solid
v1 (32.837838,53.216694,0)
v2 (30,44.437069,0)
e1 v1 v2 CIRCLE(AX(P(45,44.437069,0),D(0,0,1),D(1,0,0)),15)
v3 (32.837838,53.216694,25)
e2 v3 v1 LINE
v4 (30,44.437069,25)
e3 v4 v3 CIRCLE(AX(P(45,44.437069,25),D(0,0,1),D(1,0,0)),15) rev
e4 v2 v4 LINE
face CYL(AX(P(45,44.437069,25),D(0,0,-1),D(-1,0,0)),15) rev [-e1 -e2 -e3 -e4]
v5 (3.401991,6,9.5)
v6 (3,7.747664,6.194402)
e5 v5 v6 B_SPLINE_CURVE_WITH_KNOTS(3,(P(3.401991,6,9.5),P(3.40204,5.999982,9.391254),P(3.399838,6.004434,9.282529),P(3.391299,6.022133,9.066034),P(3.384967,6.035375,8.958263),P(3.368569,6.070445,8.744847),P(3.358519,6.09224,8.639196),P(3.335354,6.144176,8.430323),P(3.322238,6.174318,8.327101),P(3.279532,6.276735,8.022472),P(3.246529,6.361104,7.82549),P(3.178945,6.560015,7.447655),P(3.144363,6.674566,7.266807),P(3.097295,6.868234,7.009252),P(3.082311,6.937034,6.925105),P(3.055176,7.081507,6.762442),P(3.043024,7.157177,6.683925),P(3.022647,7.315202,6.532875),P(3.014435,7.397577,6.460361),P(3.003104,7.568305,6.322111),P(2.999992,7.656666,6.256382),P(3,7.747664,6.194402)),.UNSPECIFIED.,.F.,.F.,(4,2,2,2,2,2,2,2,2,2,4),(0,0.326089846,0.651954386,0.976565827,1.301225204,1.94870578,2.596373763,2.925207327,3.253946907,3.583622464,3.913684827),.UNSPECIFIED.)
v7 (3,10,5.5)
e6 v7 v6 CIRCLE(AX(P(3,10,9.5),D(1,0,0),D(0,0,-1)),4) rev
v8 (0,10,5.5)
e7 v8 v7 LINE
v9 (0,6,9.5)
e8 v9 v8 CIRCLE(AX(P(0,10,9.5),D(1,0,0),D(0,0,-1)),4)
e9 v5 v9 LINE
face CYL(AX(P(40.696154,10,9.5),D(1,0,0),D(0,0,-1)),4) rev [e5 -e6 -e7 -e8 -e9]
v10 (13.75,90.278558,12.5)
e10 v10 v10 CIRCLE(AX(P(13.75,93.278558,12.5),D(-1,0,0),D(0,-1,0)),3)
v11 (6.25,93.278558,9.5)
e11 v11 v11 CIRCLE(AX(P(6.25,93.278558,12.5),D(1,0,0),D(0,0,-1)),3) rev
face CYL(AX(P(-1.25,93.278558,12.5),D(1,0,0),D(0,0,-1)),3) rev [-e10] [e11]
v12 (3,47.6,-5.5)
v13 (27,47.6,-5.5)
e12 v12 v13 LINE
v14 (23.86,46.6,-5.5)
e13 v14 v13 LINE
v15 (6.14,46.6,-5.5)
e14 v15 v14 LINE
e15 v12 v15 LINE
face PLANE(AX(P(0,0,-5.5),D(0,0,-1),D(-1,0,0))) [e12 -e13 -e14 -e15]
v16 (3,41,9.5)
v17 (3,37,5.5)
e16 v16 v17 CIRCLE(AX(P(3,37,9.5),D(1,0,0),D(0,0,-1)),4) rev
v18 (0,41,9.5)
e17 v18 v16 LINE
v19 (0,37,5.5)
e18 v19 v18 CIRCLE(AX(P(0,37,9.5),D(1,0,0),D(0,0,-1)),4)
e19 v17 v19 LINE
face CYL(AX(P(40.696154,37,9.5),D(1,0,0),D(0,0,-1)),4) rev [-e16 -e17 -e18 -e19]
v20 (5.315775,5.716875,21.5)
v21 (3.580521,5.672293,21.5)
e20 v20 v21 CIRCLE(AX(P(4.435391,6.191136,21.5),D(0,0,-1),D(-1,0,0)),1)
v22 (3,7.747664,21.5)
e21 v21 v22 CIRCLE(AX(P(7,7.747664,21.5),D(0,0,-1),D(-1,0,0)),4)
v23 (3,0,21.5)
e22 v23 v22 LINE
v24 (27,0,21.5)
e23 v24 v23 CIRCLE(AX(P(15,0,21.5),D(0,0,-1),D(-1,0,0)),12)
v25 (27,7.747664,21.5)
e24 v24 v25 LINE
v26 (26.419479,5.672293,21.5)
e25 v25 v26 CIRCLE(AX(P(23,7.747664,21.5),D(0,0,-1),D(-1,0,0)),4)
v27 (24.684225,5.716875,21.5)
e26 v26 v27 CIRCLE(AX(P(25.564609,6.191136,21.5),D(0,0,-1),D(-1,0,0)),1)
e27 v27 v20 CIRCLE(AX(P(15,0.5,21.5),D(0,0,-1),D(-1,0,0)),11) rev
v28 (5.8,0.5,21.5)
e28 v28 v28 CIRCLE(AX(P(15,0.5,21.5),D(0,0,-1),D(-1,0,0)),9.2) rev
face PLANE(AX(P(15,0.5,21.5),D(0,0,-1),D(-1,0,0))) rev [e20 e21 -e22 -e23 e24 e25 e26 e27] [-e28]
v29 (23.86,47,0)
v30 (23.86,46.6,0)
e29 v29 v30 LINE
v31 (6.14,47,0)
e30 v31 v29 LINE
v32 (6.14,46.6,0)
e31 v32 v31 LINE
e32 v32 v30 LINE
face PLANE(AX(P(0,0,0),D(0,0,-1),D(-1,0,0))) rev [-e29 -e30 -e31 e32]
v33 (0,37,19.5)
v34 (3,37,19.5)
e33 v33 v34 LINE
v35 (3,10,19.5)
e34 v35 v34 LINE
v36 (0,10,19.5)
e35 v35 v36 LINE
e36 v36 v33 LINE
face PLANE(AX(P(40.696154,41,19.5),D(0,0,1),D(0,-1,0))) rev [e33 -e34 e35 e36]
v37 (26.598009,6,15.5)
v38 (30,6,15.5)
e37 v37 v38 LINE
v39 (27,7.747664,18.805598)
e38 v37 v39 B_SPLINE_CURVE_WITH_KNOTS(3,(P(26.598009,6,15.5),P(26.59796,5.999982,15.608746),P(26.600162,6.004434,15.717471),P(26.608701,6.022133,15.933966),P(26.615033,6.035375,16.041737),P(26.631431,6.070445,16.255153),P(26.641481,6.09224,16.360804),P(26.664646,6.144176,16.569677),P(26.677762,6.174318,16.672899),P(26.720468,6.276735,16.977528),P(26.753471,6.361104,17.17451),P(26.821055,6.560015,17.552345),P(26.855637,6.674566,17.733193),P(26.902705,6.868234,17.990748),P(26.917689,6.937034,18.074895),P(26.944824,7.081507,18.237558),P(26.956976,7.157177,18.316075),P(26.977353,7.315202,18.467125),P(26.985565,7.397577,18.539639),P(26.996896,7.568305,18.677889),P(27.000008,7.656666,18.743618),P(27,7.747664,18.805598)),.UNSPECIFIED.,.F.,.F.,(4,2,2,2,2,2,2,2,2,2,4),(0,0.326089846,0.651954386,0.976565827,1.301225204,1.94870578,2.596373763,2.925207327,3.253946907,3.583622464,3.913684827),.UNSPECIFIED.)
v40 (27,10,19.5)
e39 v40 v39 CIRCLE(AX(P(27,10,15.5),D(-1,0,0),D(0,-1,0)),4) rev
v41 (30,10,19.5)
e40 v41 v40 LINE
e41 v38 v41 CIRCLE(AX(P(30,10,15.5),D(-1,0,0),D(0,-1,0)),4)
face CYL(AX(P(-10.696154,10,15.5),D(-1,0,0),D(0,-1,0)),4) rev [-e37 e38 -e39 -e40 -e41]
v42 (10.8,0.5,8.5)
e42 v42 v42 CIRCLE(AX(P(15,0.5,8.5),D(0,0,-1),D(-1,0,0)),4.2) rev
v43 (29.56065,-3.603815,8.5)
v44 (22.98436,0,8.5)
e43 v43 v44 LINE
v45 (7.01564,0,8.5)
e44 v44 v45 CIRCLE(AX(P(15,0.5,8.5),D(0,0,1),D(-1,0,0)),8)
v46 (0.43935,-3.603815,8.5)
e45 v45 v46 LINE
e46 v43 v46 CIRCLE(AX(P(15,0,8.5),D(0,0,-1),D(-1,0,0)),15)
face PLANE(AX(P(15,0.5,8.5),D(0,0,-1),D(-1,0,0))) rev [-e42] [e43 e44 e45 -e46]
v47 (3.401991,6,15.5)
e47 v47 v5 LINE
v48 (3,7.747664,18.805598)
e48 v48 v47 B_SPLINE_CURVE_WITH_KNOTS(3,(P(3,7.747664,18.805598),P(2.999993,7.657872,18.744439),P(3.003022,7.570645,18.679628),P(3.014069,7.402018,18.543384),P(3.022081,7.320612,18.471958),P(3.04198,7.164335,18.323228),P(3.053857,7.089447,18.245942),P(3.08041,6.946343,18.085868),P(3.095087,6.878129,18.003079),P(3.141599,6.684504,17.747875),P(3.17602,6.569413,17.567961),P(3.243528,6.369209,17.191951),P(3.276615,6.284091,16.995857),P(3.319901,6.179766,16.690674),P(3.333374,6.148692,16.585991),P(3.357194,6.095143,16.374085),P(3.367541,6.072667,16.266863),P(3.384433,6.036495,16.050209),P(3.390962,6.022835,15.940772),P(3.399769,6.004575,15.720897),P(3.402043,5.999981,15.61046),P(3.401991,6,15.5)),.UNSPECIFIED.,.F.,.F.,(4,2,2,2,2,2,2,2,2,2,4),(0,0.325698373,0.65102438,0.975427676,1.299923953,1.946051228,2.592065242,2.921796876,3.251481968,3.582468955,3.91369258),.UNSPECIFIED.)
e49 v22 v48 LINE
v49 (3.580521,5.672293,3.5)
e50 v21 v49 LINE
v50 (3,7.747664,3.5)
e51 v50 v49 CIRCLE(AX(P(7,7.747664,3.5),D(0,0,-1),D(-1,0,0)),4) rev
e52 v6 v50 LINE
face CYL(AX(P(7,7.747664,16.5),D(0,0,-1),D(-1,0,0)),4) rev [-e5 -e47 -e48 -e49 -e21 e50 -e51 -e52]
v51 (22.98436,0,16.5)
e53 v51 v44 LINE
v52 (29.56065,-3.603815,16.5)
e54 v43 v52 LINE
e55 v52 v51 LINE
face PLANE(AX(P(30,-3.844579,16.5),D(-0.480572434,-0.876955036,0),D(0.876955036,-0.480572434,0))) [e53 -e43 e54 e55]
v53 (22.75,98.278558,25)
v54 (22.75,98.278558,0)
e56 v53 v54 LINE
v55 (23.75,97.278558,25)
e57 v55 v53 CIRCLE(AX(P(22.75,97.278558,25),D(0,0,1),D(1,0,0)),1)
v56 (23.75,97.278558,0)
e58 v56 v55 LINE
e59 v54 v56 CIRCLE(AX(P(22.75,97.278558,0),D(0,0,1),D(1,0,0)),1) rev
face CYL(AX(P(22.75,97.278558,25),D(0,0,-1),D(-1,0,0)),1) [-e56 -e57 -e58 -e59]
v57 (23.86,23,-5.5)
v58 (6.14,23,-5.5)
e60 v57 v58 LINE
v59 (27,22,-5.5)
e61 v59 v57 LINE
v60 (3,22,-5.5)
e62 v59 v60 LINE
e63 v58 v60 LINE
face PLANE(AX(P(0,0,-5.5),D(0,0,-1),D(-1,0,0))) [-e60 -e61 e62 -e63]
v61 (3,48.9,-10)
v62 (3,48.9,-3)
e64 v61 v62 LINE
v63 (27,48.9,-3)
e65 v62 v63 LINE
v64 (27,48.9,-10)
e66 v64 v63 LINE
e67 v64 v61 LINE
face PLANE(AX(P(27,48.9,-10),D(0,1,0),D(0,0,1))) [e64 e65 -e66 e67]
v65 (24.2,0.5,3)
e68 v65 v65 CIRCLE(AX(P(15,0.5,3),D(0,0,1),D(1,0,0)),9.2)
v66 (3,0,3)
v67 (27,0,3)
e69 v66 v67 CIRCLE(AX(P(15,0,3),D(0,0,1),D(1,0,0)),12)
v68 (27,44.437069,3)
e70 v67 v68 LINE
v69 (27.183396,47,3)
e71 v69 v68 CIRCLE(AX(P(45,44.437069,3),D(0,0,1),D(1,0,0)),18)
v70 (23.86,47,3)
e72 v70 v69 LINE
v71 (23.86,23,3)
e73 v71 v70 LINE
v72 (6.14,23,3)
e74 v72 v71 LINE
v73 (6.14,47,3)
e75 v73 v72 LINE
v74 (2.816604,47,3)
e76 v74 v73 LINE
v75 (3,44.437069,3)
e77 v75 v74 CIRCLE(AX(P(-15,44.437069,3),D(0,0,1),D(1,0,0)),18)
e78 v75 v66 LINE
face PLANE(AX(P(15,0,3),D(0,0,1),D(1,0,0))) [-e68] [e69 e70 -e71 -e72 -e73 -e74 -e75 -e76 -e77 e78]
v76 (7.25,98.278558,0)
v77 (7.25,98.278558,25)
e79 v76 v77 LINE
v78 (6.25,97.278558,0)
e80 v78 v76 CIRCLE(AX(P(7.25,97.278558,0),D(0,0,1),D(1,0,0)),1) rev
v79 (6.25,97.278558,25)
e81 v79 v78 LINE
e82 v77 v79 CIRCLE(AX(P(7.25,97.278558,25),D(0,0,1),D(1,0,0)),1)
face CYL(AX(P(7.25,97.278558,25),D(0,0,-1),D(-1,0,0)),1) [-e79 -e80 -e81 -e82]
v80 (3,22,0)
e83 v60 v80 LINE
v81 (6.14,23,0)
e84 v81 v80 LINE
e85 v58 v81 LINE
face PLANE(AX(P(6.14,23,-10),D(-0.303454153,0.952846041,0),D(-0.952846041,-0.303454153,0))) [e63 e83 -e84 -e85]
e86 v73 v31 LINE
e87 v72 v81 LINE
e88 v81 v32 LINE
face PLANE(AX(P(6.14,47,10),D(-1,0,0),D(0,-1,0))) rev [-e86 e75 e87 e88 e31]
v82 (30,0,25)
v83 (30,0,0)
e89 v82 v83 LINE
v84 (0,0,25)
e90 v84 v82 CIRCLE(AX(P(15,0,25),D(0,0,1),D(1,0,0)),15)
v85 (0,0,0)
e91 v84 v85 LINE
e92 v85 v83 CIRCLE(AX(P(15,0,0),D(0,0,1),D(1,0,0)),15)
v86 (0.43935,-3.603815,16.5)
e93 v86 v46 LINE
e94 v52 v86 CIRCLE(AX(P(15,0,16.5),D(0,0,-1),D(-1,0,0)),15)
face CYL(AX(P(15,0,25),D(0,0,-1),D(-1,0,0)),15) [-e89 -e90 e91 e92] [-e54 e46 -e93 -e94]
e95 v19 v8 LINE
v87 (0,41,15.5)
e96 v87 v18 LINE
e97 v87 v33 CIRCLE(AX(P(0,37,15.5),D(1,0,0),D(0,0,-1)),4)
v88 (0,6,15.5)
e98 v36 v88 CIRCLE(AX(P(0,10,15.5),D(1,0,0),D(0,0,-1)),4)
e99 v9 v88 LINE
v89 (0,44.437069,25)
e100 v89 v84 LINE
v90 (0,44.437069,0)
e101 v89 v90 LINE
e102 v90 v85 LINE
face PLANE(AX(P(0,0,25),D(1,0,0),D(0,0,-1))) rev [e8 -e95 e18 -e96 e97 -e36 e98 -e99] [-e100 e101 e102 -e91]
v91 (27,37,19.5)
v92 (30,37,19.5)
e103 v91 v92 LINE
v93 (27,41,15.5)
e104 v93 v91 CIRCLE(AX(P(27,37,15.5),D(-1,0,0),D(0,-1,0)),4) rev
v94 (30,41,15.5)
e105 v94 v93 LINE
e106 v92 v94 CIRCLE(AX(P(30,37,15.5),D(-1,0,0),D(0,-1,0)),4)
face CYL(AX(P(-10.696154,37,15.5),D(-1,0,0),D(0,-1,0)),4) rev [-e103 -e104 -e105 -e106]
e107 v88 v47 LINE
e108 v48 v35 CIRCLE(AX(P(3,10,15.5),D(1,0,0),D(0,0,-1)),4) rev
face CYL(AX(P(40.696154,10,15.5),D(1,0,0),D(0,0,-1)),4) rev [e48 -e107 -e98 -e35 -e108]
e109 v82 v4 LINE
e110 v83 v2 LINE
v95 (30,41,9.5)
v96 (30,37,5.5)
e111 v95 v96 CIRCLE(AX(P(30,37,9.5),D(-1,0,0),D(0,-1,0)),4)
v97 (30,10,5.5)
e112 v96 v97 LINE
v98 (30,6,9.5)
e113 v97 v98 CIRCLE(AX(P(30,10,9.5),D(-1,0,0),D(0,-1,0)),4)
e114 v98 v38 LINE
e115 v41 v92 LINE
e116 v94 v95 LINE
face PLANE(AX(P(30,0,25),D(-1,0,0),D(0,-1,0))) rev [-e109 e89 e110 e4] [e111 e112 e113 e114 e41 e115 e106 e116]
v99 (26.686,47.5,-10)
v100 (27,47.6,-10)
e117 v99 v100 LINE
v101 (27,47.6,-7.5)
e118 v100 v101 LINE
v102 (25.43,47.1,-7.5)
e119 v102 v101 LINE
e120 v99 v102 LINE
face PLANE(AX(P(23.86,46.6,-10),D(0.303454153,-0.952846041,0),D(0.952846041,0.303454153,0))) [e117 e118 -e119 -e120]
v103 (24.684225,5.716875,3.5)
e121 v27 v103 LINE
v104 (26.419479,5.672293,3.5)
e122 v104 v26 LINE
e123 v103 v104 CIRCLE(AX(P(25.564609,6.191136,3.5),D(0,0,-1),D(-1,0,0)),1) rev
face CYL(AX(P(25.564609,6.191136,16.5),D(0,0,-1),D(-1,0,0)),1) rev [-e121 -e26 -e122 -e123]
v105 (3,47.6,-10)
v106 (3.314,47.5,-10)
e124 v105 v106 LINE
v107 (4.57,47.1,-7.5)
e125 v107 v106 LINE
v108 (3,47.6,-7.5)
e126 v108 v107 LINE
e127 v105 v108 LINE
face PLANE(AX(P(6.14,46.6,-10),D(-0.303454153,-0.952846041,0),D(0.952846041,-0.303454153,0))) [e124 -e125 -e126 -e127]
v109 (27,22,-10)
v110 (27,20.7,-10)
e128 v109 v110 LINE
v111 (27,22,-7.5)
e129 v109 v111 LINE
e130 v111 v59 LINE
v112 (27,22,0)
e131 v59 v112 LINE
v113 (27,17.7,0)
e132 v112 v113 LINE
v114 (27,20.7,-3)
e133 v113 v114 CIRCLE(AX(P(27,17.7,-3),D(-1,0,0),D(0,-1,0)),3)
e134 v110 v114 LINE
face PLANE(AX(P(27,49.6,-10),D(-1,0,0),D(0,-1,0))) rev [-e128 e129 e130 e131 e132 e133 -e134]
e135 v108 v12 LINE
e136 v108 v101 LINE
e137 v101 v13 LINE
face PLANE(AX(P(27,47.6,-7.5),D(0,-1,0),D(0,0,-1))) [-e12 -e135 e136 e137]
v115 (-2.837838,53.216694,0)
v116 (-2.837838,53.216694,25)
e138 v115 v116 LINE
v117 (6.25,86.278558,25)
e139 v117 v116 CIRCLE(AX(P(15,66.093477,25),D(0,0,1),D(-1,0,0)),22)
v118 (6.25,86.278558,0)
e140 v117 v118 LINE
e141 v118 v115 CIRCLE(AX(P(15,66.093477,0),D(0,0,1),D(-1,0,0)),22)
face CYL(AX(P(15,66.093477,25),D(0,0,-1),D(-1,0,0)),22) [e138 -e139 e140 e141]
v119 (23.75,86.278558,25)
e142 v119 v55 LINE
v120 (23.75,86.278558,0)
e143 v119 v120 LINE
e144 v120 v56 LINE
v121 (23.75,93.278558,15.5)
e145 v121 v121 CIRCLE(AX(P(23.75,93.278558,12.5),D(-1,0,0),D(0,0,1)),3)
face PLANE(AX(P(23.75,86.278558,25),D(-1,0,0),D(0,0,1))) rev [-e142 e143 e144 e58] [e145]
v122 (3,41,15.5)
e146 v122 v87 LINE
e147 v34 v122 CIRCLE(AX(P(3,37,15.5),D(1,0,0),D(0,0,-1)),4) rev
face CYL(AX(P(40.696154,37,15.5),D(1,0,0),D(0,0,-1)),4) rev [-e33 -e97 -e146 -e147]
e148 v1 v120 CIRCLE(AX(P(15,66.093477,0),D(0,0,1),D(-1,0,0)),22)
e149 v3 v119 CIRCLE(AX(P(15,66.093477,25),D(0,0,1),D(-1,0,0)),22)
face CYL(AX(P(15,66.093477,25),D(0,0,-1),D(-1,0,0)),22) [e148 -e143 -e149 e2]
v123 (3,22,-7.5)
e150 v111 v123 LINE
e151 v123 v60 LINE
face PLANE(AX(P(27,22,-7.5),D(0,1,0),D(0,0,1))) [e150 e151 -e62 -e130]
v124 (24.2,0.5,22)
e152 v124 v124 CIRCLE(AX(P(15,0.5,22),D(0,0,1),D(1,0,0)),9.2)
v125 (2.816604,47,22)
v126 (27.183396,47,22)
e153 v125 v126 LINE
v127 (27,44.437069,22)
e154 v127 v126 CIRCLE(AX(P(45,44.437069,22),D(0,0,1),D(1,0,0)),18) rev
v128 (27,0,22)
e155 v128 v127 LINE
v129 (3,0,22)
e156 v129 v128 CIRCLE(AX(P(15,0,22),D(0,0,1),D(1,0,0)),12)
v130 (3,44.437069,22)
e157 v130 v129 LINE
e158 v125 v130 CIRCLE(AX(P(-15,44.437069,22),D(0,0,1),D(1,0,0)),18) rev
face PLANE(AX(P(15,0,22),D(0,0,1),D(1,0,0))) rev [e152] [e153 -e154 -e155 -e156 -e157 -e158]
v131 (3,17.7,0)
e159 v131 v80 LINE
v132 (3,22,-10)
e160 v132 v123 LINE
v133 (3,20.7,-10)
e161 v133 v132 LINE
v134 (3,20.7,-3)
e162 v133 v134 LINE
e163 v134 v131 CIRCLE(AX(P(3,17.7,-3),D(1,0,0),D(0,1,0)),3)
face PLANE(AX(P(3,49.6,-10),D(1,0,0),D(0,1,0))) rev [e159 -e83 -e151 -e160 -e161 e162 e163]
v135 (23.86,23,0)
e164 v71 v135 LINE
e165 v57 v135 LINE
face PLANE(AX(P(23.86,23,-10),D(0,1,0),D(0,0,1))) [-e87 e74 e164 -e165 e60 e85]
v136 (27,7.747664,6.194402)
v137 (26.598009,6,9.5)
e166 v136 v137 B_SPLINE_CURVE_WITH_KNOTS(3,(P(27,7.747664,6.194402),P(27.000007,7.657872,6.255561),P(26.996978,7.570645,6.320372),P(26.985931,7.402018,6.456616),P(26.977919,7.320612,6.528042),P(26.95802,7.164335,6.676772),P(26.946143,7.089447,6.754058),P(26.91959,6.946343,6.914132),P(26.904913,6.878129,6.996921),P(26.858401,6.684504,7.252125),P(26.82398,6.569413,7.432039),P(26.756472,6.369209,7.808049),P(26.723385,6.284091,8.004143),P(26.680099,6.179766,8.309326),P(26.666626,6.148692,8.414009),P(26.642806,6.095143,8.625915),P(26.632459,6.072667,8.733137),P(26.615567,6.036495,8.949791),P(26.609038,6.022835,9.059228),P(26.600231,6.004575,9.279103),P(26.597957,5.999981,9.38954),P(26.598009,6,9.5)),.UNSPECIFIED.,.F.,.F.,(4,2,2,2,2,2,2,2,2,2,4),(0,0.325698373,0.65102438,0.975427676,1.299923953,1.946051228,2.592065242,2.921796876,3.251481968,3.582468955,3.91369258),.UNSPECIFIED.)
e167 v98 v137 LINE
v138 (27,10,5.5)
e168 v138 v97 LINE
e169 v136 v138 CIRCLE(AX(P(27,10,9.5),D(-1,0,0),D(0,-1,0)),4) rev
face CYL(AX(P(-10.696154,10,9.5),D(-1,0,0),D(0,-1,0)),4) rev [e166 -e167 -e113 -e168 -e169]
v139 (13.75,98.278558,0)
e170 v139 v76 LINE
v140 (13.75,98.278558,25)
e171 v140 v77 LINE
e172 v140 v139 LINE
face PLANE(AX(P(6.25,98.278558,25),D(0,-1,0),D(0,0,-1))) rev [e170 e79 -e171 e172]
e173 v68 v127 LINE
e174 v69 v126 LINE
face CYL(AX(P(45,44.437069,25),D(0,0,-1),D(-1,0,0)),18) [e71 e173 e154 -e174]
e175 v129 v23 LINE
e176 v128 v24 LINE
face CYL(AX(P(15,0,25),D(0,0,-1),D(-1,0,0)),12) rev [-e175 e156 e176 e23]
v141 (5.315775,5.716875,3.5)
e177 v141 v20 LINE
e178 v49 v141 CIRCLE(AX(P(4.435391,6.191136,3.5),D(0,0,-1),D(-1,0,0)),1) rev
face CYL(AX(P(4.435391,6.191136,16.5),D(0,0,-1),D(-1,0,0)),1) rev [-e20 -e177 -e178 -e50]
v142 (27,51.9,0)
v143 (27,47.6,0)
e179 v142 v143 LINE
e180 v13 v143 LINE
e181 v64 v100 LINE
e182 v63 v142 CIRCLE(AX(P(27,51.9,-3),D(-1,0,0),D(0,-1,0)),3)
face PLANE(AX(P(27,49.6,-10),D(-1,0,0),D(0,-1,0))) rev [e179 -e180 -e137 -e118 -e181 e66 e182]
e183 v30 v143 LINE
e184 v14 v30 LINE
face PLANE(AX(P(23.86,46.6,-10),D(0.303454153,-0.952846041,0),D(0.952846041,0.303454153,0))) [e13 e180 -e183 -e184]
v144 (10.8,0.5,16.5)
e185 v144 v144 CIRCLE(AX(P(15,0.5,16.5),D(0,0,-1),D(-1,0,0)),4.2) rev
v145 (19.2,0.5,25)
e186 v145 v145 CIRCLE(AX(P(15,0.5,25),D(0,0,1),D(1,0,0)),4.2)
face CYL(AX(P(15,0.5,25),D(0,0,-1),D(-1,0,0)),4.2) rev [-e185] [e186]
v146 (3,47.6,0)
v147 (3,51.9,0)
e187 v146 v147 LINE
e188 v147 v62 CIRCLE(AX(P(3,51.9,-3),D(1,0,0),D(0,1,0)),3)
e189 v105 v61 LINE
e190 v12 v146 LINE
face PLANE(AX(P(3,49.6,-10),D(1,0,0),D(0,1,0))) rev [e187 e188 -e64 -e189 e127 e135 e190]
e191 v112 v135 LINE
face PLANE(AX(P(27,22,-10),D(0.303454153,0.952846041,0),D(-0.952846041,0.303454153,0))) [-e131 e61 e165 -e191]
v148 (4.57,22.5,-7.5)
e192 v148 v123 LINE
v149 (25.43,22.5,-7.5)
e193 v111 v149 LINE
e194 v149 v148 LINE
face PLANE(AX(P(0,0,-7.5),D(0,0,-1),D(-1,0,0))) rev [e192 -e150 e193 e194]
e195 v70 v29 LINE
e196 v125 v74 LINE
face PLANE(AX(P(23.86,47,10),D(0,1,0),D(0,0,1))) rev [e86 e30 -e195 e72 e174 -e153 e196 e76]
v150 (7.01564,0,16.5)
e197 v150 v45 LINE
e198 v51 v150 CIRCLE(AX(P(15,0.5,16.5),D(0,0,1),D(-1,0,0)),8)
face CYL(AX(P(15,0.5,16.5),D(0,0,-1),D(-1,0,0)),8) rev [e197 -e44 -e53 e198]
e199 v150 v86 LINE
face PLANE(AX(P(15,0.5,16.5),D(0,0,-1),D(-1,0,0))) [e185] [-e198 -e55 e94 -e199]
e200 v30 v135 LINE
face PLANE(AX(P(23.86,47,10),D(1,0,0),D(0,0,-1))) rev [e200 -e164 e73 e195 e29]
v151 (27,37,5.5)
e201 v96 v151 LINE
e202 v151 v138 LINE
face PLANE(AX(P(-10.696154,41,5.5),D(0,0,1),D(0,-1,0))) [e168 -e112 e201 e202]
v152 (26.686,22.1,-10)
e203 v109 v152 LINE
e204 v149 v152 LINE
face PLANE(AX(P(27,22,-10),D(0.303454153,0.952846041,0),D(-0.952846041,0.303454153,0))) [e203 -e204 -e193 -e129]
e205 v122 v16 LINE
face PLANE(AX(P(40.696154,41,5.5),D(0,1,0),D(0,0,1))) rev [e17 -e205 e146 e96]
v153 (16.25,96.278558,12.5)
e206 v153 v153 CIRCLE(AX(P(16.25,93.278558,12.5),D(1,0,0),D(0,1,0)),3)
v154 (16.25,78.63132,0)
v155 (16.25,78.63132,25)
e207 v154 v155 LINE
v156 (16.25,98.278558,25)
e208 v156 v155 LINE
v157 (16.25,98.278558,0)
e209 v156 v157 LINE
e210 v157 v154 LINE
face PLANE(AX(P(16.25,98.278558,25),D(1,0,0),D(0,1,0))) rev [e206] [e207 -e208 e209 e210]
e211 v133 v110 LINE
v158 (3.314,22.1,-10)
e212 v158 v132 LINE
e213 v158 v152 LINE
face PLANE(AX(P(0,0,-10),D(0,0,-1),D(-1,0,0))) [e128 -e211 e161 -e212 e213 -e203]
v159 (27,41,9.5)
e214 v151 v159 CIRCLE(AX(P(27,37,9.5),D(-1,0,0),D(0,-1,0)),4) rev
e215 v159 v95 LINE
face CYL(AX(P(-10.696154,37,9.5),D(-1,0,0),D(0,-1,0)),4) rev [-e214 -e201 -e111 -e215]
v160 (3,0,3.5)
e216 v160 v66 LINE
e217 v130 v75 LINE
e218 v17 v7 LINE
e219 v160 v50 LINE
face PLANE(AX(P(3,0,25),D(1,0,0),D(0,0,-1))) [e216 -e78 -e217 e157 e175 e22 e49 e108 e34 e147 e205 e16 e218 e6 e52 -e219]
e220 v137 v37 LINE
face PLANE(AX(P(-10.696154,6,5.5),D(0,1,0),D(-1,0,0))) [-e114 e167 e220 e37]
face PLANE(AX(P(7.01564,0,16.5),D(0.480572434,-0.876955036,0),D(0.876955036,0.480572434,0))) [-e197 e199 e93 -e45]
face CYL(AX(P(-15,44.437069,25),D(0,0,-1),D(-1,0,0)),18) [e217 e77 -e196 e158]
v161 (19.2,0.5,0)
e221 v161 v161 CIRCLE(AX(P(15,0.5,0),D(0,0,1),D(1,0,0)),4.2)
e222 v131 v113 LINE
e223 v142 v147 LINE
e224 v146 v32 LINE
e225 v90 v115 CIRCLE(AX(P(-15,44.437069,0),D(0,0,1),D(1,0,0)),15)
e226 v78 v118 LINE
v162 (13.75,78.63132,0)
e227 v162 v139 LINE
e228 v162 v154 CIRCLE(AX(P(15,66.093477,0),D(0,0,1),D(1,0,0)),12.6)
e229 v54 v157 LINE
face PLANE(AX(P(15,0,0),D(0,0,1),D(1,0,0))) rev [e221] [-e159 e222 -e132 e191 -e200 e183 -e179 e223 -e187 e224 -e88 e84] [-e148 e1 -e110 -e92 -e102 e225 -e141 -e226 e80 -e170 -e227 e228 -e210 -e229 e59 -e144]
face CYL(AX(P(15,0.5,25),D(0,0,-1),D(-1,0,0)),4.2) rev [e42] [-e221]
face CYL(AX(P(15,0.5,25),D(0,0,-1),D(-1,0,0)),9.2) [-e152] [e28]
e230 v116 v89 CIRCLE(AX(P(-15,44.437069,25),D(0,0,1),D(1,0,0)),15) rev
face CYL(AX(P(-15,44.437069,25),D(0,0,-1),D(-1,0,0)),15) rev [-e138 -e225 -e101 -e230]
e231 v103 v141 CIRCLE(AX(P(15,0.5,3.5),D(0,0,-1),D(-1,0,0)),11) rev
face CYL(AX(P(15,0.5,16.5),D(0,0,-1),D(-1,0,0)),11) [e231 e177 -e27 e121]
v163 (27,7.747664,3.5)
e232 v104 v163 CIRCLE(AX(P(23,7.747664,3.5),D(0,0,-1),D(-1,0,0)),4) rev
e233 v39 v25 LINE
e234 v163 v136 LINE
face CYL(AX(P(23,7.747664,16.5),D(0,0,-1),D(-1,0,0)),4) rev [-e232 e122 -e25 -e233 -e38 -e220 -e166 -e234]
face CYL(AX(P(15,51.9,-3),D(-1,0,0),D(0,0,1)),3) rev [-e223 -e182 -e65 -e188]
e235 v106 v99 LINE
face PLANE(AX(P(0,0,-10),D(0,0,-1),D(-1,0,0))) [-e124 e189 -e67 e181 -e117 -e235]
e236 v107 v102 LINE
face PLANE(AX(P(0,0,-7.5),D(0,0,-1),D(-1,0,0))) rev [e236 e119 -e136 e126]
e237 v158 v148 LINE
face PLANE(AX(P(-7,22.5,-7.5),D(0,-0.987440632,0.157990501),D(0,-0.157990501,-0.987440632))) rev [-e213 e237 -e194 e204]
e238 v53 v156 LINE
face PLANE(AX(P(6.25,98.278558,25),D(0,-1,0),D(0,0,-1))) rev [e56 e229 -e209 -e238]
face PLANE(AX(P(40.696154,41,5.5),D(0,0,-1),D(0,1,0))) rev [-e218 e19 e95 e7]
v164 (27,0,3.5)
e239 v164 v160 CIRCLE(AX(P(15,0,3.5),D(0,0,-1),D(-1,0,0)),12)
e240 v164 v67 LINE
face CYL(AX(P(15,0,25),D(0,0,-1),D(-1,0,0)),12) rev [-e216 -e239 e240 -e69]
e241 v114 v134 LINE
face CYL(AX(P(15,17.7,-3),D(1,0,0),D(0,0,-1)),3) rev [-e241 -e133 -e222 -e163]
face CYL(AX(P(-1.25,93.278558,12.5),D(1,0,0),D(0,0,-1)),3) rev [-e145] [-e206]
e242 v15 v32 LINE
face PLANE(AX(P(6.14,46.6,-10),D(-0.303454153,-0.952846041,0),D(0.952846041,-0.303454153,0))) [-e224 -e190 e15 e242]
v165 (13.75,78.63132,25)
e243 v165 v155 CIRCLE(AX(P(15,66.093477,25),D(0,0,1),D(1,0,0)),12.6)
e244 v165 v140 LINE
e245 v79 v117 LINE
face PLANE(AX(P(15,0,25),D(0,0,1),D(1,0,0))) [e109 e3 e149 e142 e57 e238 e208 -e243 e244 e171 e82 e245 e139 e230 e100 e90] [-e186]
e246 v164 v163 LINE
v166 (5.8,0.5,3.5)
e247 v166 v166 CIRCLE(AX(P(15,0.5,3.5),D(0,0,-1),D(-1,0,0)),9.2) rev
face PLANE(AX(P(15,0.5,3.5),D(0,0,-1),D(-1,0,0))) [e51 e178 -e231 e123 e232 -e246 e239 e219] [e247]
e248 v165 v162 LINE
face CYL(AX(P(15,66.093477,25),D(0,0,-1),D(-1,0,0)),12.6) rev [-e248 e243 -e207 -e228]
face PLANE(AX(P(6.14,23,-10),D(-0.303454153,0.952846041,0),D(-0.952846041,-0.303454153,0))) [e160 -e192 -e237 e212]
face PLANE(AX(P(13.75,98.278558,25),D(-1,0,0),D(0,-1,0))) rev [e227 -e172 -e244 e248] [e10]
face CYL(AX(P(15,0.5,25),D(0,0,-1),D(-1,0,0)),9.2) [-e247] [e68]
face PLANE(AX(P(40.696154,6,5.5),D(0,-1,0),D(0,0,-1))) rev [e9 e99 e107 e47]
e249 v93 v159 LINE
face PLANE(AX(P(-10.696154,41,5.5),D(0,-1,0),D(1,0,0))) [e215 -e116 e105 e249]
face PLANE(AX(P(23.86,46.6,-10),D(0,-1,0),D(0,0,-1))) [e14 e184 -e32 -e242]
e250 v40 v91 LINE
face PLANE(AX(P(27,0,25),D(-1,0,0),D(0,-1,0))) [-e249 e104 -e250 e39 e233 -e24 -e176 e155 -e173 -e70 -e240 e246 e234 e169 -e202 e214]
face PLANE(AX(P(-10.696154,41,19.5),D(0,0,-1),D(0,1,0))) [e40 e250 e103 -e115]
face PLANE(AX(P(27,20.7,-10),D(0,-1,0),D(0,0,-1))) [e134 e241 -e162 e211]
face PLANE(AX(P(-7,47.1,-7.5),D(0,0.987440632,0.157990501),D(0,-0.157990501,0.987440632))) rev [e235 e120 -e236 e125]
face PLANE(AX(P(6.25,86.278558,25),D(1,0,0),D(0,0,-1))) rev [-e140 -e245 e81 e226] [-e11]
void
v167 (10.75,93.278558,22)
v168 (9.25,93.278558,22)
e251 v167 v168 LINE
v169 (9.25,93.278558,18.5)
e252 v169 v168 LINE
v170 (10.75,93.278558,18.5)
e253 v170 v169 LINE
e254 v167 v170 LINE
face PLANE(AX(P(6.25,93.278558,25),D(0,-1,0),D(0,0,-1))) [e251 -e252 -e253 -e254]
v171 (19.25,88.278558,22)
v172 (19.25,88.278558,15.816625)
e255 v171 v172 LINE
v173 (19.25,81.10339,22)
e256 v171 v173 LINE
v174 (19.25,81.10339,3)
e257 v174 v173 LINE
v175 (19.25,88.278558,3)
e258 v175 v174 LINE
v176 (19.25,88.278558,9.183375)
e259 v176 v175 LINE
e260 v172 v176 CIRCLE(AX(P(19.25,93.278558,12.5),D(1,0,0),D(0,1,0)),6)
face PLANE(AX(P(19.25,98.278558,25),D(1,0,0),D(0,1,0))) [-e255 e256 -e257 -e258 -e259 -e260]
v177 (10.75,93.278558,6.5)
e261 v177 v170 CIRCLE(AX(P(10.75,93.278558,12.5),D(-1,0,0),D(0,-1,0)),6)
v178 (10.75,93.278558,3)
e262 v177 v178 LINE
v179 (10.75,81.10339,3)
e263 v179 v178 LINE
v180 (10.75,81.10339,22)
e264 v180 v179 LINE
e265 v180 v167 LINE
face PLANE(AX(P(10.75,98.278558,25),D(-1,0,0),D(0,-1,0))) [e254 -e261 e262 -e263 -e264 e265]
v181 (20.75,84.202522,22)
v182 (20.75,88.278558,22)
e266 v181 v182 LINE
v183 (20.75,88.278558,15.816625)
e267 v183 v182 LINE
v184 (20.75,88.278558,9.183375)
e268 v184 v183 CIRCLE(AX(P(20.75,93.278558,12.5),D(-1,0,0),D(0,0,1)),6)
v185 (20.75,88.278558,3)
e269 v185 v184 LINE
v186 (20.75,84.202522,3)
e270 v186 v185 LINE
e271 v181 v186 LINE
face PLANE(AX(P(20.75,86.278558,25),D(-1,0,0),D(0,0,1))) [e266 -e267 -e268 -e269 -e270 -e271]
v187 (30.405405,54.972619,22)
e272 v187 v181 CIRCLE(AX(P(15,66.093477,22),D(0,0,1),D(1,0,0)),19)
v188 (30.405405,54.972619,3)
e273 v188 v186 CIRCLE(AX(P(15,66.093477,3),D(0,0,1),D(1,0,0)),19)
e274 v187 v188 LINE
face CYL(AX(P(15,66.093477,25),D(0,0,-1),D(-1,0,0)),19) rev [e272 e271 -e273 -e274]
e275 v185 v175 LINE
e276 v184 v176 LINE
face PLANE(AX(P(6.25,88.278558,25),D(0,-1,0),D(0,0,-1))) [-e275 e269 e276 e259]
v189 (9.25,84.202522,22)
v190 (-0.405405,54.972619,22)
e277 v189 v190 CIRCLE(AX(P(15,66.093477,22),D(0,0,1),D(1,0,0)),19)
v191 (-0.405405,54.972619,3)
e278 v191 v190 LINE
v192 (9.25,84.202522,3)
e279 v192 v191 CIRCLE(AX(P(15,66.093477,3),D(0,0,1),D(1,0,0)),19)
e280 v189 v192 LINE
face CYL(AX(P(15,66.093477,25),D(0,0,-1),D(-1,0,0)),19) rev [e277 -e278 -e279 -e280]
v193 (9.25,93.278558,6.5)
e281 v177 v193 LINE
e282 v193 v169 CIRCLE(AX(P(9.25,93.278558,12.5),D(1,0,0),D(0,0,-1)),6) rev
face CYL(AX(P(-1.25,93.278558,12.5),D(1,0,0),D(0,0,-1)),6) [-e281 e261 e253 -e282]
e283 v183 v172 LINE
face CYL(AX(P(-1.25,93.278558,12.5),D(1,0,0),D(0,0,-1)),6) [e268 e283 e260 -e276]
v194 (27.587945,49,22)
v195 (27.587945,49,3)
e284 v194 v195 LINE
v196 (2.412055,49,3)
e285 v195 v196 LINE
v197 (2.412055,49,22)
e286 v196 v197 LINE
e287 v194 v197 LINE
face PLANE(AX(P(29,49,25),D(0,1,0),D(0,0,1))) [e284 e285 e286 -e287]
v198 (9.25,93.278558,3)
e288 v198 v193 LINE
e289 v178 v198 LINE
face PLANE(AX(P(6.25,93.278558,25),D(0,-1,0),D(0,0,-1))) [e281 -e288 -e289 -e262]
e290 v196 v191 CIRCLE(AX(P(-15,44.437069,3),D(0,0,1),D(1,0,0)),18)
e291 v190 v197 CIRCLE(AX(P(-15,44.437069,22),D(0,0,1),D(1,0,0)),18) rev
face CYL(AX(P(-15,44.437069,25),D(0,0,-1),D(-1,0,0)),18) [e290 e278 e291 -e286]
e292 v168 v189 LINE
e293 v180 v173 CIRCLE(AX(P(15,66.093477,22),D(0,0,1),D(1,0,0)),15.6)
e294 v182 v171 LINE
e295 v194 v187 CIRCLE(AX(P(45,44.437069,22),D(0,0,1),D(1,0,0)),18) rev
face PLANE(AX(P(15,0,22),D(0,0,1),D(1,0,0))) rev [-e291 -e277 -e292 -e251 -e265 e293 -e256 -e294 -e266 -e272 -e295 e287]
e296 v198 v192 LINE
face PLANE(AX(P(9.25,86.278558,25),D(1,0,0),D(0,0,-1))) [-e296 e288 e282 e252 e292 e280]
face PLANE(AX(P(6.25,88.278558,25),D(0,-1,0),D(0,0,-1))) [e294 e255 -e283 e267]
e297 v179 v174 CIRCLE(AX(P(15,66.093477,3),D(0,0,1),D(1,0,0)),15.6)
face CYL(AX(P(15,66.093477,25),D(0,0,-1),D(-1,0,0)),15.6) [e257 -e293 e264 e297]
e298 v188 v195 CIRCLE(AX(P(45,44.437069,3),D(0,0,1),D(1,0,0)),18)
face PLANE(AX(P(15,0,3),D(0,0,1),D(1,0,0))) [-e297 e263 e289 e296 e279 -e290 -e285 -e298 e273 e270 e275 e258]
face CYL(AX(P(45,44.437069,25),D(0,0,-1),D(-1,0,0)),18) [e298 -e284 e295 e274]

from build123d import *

# Parameters (mm, degrees)
BOSS_EXTRUDE1_DEPTH      = 25
CUT_EXTRUDE4_START       = 8.5
CUT_EXTRUDE4_DEPTH       = 8
SKETCH10_R               = 4.2
CUT_EXTRUDE6_DEPTH       = 99.764673235
SKETCH11_W               = 24
SKETCH11_H               = 29.6
BOSS_EXTRUDE2_DEPTH      = 10
CUT_EXTRUDE7_DEPTH       = 99.764673235
CUT_EXTRUDE8_START       = 5.5
SKETCH14_W               = 24
SKETCH14_H               = 25.6
CUT_EXTRUDE8_DEPTH       = 2
SKETCH22_R               = 12.6
CUT_EXTRUDE16_DEPTH      = 99.764673235
SKETCH24_W               = 17.5
SKETCH24_H               = 12
BOSS_EXTRUDE3_DEPTH      = 25
FILLET6_R                = 15
FILLET7_R                = 1
SKETCH25_R               = 3
CUT_EXTRUDE18_DEPTH      = 25
SKETCH26_W               = 2.5
SKETCH26_H               = 20
CUT_EXTRUDE19_DEPTH      = 25
SHELL14_START            = 9.25
SHELL14_DEPTH            = 1.5
SHELL14_START_2          = 3
SHELL14_2_DEPTH          = 19
SHELL14_3_OUTLINE_R      = 9.2
SHELL14_3_DEPTH          = 0.5
SHELL14_START_3          = 21.5
SHELL14_4_OUTLINE_R      = 9.2
SHELL14_4_DEPTH          = 0.5
SHELL14_START_4          = 8
SHELL14_5_DEPTH          = 2.75
SHELL14_START_5          = 19.25
SHELL14_6_DEPTH          = 1.5
SKETCH27_W               = 17.72
SKETCH27_H               = 24
CUT_EXTRUDE20_DEPTH      = 10
SKETCH28_W               = 14
SKETCH28_H               = 35
CUT_EXTRUDE21_DEPTH      = 3
SKETCH29_W               = 14
SKETCH29_H               = 35
CUT_EXTRUDE22_DEPTH      = 3
FILLET8_R                = 4
FILLET9_START            = 3.5
FILLET9_DEPTH            = 18
FILLET9_START_2          = 15.4999999
FILLET9_2_DEPTH          = 6.0000001
FILLET9_3_DEPTH          = 6
FILLET9_START_3          = 26.598008456
FILLET9_4_DEPTH          = 0.401991544
FILLET9_START_4          = 3
FILLET9_5_DEPTH          = 0.401990551
FILLET10_R               = 1
CUT_EXTRUDE23_DEPTH      = 108.947556596
CUT_EXTRUDE23_DEPTH_BACK = 108.947556596
SKETCH32_W               = 24
SKETCH32_H               = 0.7
CUT_EXTRUDE24_DEPTH      = 108.947556596
FILLET11_R               = 3
BOSS_EXTRUDE4_REACH      = 109.948
SKETCH33_W               = 28
SKETCH33_H               = 2


with BuildPart() as part:
    # Sketch1 → Boss-Extrude1 (new body)
    with BuildSketch(Plane.XY):
        with BuildLine():
            Line((30, 0), (30, 50))
            ThreePointArc((30, 50), (15, 88.093476939), (0, 50))
            Line((0, 50), (0, 0))
            ThreePointArc((0, 0), (15, -15), (30, 0))
        make_face()
    extrude(amount=BOSS_EXTRUDE1_DEPTH)

    # Sketch9 → Cut-Extrude4 (cut)
    with BuildSketch(Plane.XY.offset(CUT_EXTRUDE4_START)):
        with BuildLine():
            Line((7.015640289, 0), (0, -3.844579475))
            Line((0, -3.844579475), (0, -19.136394538))
            Line((0, -19.136394538), (30, -19.136394538))
            Line((30, -19.136394538), (30, -3.844579475))
            Line((30, -3.844579475), (22.984359711, 0))
            ThreePointArc((22.984359711, 0), (15, 8.5), (7.015640289, 0))
        make_face()
    extrude(amount=CUT_EXTRUDE4_DEPTH, mode=Mode.SUBTRACT)

    # Sketch10 → Cut-Extrude6 (cut, through all)
    with BuildSketch(Plane.XY):
        with Locations(Location((15, 0.5, 0), (0, 0, 180))):
            Circle(SKETCH10_R)
    extrude(amount=CUT_EXTRUDE6_DEPTH, mode=Mode.SUBTRACT)

    # Sketch11 → Boss-Extrude2 (add)
    with BuildSketch(Plane(origin=(0, 0, 0), x_dir=(-1, 0, 0), z_dir=(0, 0, -1))):
        with Locations((-15, 34.8)):
            Rectangle(SKETCH11_W, SKETCH11_H)
    extrude(amount=BOSS_EXTRUDE2_DEPTH)

    # Sketch12 → Cut-Extrude7 (cut, through all)
    with BuildSketch(Plane(origin=(0, 0, 0), x_dir=(-1, 0, 0), z_dir=(0, 0, -1))):
        Polygon((-3, 47.6), (-3, 22), (-6.14, 23), (-23.86, 23), (-27, 22), (-27, 47.6), (-23.86, 46.6), (-6.14, 46.6), align=None)
    extrude(amount=CUT_EXTRUDE7_DEPTH, mode=Mode.SUBTRACT)

    # Sketch14 → Cut-Extrude8 (cut)
    with BuildSketch(Plane(origin=(0, 0, 0), x_dir=(-1, 0, 0), z_dir=(0, 0, -1)).offset(CUT_EXTRUDE8_START)):
        with Locations((-15, 34.8)):
            Rectangle(SKETCH14_W, SKETCH14_H)
    extrude(amount=CUT_EXTRUDE8_DEPTH, mode=Mode.SUBTRACT)

    # Sketch22 → Cut-Extrude16 (cut, through all)
    with BuildSketch(Plane.XY):
        with Locations((15, 66.093476939)):
            Circle(SKETCH22_R)
    extrude(amount=CUT_EXTRUDE16_DEPTH, mode=Mode.SUBTRACT)

    # Sketch24 → Boss-Extrude3 (add)
    with BuildSketch(Plane.XY):
        with Locations((15, 92.278558064)):
            Rectangle(SKETCH24_W, SKETCH24_H)
    extrude(amount=BOSS_EXTRUDE3_DEPTH)

    # Fillet6
    fillet6_edges = [part.edges().sort_by_distance(p)[0] for p in [
        (0, 50, 12.5),
        (30, 50, 12.5),
    ]]
    fillet(fillet6_edges, radius=FILLET6_R)

    # Fillet7
    fillet7_edges = [part.edges().sort_by_distance(p)[0] for p in [
        (6.25, 98.278558064, 12.5),
        (23.75, 98.278558064, 12.5),
    ]]
    fillet(fillet7_edges, radius=FILLET7_R)

    # Sketch25 → Cut-Extrude18 (cut)
    with BuildSketch(Plane(origin=(23.75, 0, 23.75), x_dir=(0, 0, 1), z_dir=(-1, 0, 0))):
        with Locations(Location((-11.25, 93.278558064, 0), (0, 0, 180))):
            Circle(SKETCH25_R)
    extrude(amount=CUT_EXTRUDE18_DEPTH, mode=Mode.SUBTRACT)

    # Sketch26 → Cut-Extrude19 (cut)
    with BuildSketch(Plane(origin=(0, 0, 0), x_dir=(-1, 0, 0), z_dir=(0, 0, -1))):
        with Locations((-15, 88.278558064)):
            Rectangle(SKETCH26_W, SKETCH26_H)
    extrude(amount=-CUT_EXTRUDE19_DEPTH, mode=Mode.SUBTRACT)

    # Shell14: read off the stored shape, not the designer's step
    # Shell14 outline → Shell14 (cut)
    with BuildSketch(Plane.YZ.offset(SHELL14_START)):
        with BuildLine():
            Line((93.278558064, 22), (88.278558064, 22))
            Line((88.278558064, 22), (88.278558064, 15.81662479))
            ThreePointArc((88.278558064, 15.81662479), (90.441283733, 17.786764074), (93.278558064, 18.5))
            Line((93.278558064, 18.5), (93.278558064, 22))
        make_face()
        with BuildLine():
            ThreePointArc((93.278558064, 6.5), (90.441283733, 7.213235926), (88.278558064, 9.18337521))
            Line((88.278558064, 9.18337521), (88.278558064, 3))
            Line((88.278558064, 3), (93.278558064, 3))
            Line((93.278558064, 3), (93.278558064, 6.5))
        make_face()
    extrude(amount=SHELL14_DEPTH, mode=Mode.SUBTRACT)

    # Shell14 2 outline → Shell14 2 (cut)
    with BuildSketch(Plane.XY.offset(SHELL14_START_2)):
        with BuildLine():
            Line((20.75, 88.278558064), (19.25, 88.278558064))
            Line((19.25, 88.278558064), (19.25, 81.10339033))
            ThreePointArc((19.25, 81.10339033), (15, 50.493476939), (10.75, 81.10339033))
            Line((10.75, 81.10339033), (10.75, 88.278558064))
            Line((10.75, 88.278558064), (9.25, 88.278558064))
            Line((9.25, 88.278558064), (9.25, 84.202521641))
            ThreePointArc((9.25, 84.202521641), (-3.041191716, 72.052956906), (-0.405405405, 54.972618866))
            ThreePointArc((-0.405405405, 54.972618866), (2.127502776, 49.973191279), (3, 44.437069112))
            Line((3, 44.437069112), (3, 3.500970796))
            Line((3, 3.500970796), (4.734171365, 4.451298829))
            ThreePointArc((4.734171365, 4.451298829), (15, 11.5), (25.265828635, 4.451298829))
            Line((25.265828635, 4.451298829), (27, 3.500970796))
            Line((27, 3.500970796), (27, 44.437069112))
            ThreePointArc((27, 44.437069112), (27.872497224, 49.973191279), (30.405405405, 54.972618866))
            ThreePointArc((30.405405405, 54.972618866), (33.041191716, 72.052956906), (20.75, 84.202521641))
            Line((20.75, 84.202521641), (20.75, 88.278558064))
        make_face()
    extrude(amount=SHELL14_2_DEPTH, mode=Mode.SUBTRACT)

    # Shell14 3 outline → Shell14 3 (cut)
    with BuildSketch(Plane.XY.offset(SHELL14_START_2)):
        with BuildLine():
            Line((27, 0), (27, 3.500970796))
            Line((27, 3.500970796), (25.265828635, 4.451298829))
            ThreePointArc((25.265828635, 4.451298829), (15, 11.5), (4.734171365, 4.451298829))
            Line((4.734171365, 4.451298829), (3, 3.500970796))
            Line((3, 3.500970796), (3, 0))
            ThreePointArc((3, 0), (15, -12), (27, 0))
        make_face()
        with Locations((15, 0.5)):
            Circle(SHELL14_3_OUTLINE_R, mode=Mode.SUBTRACT)
    extrude(amount=SHELL14_3_DEPTH, mode=Mode.SUBTRACT)

    # Shell14 4 outline → Shell14 4 (cut)
    with BuildSketch(Plane.XY.offset(SHELL14_START_3)):
        with BuildLine():
            Line((27, 0), (27, 3.500970796))
            Line((27, 3.500970796), (25.265828635, 4.451298829))
            ThreePointArc((25.265828635, 4.451298829), (15, 11.5), (4.734171365, 4.451298829))
            Line((4.734171365, 4.451298829), (3, 3.500970796))
            Line((3, 3.500970796), (3, 0))
            ThreePointArc((3, 0), (15, -12), (27, 0))
        make_face()
        with Locations((15, 0.5)):
            Circle(SHELL14_4_OUTLINE_R, mode=Mode.SUBTRACT)
    extrude(amount=SHELL14_4_DEPTH, mode=Mode.SUBTRACT)

    # Shell14 5 outline → Shell14 5 (add)
    with BuildSketch(Plane.YZ.offset(SHELL14_START_4)):
        with BuildLine():
            Line((88.278558064, 9.18337521), (88.278558064, 15.81662479))
            ThreePointArc((88.278558064, 15.81662479), (87.278558064, 12.5), (88.278558064, 9.18337521))
        make_face()
    extrude(amount=SHELL14_5_DEPTH)

    # Shell14 6 outline → Shell14 6 (add)
    with BuildSketch(Plane.YZ.offset(SHELL14_START_5)):
        with BuildLine():
            Line((88.278558064, 9.18337521), (88.278558064, 15.81662479))
            ThreePointArc((88.278558064, 15.81662479), (87.278558064, 12.5), (88.278558064, 9.18337521))
        make_face()
    extrude(amount=SHELL14_6_DEPTH)

    # Sketch27 → Cut-Extrude20 (cut)
    with BuildSketch(Plane(origin=(0, 0, 0), x_dir=(-1, 0, 0), z_dir=(0, 0, -1))):
        with Locations((-15, 35)):
            Rectangle(SKETCH27_W, SKETCH27_H)
    extrude(amount=-CUT_EXTRUDE20_DEPTH, mode=Mode.SUBTRACT)

    # Sketch28 → Cut-Extrude21 (cut)
    with BuildSketch(Plane.ZY):
        with Locations((12.5, 23.5)):
            Rectangle(SKETCH28_W, SKETCH28_H)
    extrude(amount=-CUT_EXTRUDE21_DEPTH, mode=Mode.SUBTRACT)

    # Sketch29 → Cut-Extrude22 (cut)
    with BuildSketch(Plane(origin=(30, 0, -30), x_dir=(0, 0, 1), z_dir=(-1, 0, 0))):
        with Locations((42.5, 23.5)):
            Rectangle(SKETCH29_W, SKETCH29_H)
    extrude(amount=CUT_EXTRUDE22_DEPTH, mode=Mode.SUBTRACT)

    # Fillet8
    fillet8_edges = [part.edges().sort_by_distance(p)[0] for p in [
        (1.5, 6, 19.5),
        (1.5, 41, 19.5),
        (1.5, 41, 5.5),
        (1.5, 6, 5.5),
        (28.5, 41, 5.5),
        (28.5, 6, 5.5),
        (28.5, 6, 19.5),
        (28.5, 41, 19.5),
    ]]
    fillet(fillet8_edges, radius=FILLET8_R)

    # Fillet9: read off the stored shape, not the designer's step
    # Fillet9 outline → Fillet9 (add)
    with BuildSketch(Plane.XY.offset(FILLET9_START)):
        with BuildLine():
            Line((3.401990551, 6), (3, 6))
            Line((3, 6), (3, 3.500970796))
            Line((3, 3.500970796), (4.734171365, 4.451298829))
            ThreePointArc((4.734171365, 4.451298829), (3.967547511, 5.139171318), (3.401990551, 6))
        make_face()
        with BuildLine():
            Line((27, 3.500970796), (27, 6))
            Line((27, 6), (26.598009449, 6))
            ThreePointArc((26.598009449, 6), (26.032452489, 5.139171318), (25.265828635, 4.451298829))
            Line((25.265828635, 4.451298829), (27, 3.500970796))
        make_face()
    extrude(amount=FILLET9_DEPTH)

    # Fillet9 2 outline → Fillet9 2 (add)
    with BuildSketch(Plane.XY.offset(FILLET9_START_2)):
        with BuildLine():
            Line((3, 7.747663584), (3, 6))
            Line((3, 6), (3.401990551, 6))
            ThreePointArc((3.401990551, 6), (3.101792861, 6.851013651), (3, 7.747663584))
        make_face()
        with BuildLine():
            Line((26.598009449, 6), (27, 6))
            Line((27, 6), (27, 7.747663584))
            ThreePointArc((27, 7.747663584), (26.898207139, 6.851013651), (26.598009449, 6))
        make_face()
    extrude(amount=FILLET9_2_DEPTH)

    # Fillet9 3 outline → Fillet9 3 (add)
    with BuildSketch(Plane.XY.offset(FILLET9_START)):
        with BuildLine():
            Line((3, 7.747663584), (3, 6))
            Line((3, 6), (3.401990551, 6))
            ThreePointArc((3.401990551, 6), (3.101792861, 6.851013651), (3, 7.747663584))
        make_face()
        with BuildLine():
            Line((26.598009449, 6), (27, 6))
            Line((27, 6), (27, 7.747663584))
            ThreePointArc((27, 7.747663584), (26.898207139, 6.851013651), (26.598009449, 6))
        make_face()
    extrude(amount=FILLET9_3_DEPTH)

    # Fillet9 4 outline → Fillet9 4 (cut)
    with BuildSketch(Plane.YZ.offset(FILLET9_START_3)):
        with BuildLine():
            ThreePointArc((6, 9.5), (6.463805318, 7.630420591), (7.747663584, 6.194401617))
            Line((7.747663584, 6.194401617), (7.747663584, 9.5))
            Line((7.747663584, 9.5), (6, 9.5))
        make_face()
        with BuildLine():
            Line((6, 15.5), (7.747663584, 15.4999999))
            Line((7.747663584, 15.4999999), (7.747663584, 18.805598383))
            ThreePointArc((7.747663584, 18.805598383), (6.463805318, 17.369579409), (6, 15.5))
        make_face()
    extrude(amount=FILLET9_4_DEPTH, mode=Mode.SUBTRACT)

    # Fillet9 5 outline → Fillet9 5 (cut)
    with BuildSketch(Plane.YZ.offset(FILLET9_START_4)):
        with BuildLine():
            ThreePointArc((6, 9.5), (6.463805318, 7.630420591), (7.747663584, 6.194401617))
            Line((7.747663584, 6.194401617), (7.747663584, 9.5))
            Line((7.747663584, 9.5), (6, 9.5))
        make_face()
        with BuildLine():
            Line((6, 15.5), (7.747663584, 15.4999999))
            Line((7.747663584, 15.4999999), (7.747663584, 18.805598383))
            ThreePointArc((7.747663584, 18.805598383), (6.463805318, 17.369579409), (6, 15.5))
        make_face()
    extrude(amount=FILLET9_5_DEPTH, mode=Mode.SUBTRACT)

    # Fillet10
    fillet10_edges = [part.edges().sort_by_distance(p)[0] for p in [
        (25.265828635, 4.451298829, 12.5),
        (4.734171365, 4.451298829, 12.5),
    ]]
    fillet(fillet10_edges, radius=FILLET10_R)

    # Sketch30 → Cut-Extrude23 (cut, two sides: drawn at the far end of the back side and taken through both)
    with BuildSketch(Plane(origin=(0, 0, 0), x_dir=(0, 0, -1), z_dir=(1, 0, 0)).offset(-CUT_EXTRUDE23_DEPTH_BACK)):
        Polygon((10, 47.5), (10, 46.6), (7.5, 46.6), (7.5, 47.1), align=None)
        Polygon((10, 22.1), (10, 23), (7.5, 23), (7.5, 22.5), align=None)
    extrude(amount=CUT_EXTRUDE23_DEPTH + CUT_EXTRUDE23_DEPTH_BACK, mode=Mode.SUBTRACT)

    # Sketch32 → Cut-Extrude24 (cut, through all)
    with BuildSketch(Plane(origin=(0, 0, 0), x_dir=(-1, 0, 0), z_dir=(0, 0, -1))):
        with Locations((-15, 49.25)):
            Rectangle(SKETCH32_W, SKETCH32_H)
        with Locations((-15, 20.35)):
            Rectangle(SKETCH32_W, SKETCH32_H)
    extrude(amount=CUT_EXTRUDE24_DEPTH, mode=Mode.SUBTRACT)

    # Fillet11
    fillet11_edges = [part.edges().sort_by_distance(p)[0] for p in [
        (15, 48.9, 0),
        (15, 20.7, 0),
    ]]
    fillet(fillet11_edges, radius=FILLET11_R)

    # Sketch33 → Boss-Extrude4 (add, up to next)
    with BuildSketch(Plane(origin=(0, 0, 0), x_dir=(-1, 0, 0), z_dir=(0, 0, -1)), mode=Mode.PRIVATE) as boss_extrude4_sk1:
        with Locations((-15, 48)):
            Rectangle(SKETCH33_W, SKETCH33_H)
    boss_extrude4_tool1 = extrude(boss_extrude4_sk1.sketch, amount=-BOSS_EXTRUDE4_REACH, mode=Mode.PRIVATE) - part.part
    add(boss_extrude4_tool1.solids().sort_by_distance((15, 48, 0))[0])


solid = part.part
